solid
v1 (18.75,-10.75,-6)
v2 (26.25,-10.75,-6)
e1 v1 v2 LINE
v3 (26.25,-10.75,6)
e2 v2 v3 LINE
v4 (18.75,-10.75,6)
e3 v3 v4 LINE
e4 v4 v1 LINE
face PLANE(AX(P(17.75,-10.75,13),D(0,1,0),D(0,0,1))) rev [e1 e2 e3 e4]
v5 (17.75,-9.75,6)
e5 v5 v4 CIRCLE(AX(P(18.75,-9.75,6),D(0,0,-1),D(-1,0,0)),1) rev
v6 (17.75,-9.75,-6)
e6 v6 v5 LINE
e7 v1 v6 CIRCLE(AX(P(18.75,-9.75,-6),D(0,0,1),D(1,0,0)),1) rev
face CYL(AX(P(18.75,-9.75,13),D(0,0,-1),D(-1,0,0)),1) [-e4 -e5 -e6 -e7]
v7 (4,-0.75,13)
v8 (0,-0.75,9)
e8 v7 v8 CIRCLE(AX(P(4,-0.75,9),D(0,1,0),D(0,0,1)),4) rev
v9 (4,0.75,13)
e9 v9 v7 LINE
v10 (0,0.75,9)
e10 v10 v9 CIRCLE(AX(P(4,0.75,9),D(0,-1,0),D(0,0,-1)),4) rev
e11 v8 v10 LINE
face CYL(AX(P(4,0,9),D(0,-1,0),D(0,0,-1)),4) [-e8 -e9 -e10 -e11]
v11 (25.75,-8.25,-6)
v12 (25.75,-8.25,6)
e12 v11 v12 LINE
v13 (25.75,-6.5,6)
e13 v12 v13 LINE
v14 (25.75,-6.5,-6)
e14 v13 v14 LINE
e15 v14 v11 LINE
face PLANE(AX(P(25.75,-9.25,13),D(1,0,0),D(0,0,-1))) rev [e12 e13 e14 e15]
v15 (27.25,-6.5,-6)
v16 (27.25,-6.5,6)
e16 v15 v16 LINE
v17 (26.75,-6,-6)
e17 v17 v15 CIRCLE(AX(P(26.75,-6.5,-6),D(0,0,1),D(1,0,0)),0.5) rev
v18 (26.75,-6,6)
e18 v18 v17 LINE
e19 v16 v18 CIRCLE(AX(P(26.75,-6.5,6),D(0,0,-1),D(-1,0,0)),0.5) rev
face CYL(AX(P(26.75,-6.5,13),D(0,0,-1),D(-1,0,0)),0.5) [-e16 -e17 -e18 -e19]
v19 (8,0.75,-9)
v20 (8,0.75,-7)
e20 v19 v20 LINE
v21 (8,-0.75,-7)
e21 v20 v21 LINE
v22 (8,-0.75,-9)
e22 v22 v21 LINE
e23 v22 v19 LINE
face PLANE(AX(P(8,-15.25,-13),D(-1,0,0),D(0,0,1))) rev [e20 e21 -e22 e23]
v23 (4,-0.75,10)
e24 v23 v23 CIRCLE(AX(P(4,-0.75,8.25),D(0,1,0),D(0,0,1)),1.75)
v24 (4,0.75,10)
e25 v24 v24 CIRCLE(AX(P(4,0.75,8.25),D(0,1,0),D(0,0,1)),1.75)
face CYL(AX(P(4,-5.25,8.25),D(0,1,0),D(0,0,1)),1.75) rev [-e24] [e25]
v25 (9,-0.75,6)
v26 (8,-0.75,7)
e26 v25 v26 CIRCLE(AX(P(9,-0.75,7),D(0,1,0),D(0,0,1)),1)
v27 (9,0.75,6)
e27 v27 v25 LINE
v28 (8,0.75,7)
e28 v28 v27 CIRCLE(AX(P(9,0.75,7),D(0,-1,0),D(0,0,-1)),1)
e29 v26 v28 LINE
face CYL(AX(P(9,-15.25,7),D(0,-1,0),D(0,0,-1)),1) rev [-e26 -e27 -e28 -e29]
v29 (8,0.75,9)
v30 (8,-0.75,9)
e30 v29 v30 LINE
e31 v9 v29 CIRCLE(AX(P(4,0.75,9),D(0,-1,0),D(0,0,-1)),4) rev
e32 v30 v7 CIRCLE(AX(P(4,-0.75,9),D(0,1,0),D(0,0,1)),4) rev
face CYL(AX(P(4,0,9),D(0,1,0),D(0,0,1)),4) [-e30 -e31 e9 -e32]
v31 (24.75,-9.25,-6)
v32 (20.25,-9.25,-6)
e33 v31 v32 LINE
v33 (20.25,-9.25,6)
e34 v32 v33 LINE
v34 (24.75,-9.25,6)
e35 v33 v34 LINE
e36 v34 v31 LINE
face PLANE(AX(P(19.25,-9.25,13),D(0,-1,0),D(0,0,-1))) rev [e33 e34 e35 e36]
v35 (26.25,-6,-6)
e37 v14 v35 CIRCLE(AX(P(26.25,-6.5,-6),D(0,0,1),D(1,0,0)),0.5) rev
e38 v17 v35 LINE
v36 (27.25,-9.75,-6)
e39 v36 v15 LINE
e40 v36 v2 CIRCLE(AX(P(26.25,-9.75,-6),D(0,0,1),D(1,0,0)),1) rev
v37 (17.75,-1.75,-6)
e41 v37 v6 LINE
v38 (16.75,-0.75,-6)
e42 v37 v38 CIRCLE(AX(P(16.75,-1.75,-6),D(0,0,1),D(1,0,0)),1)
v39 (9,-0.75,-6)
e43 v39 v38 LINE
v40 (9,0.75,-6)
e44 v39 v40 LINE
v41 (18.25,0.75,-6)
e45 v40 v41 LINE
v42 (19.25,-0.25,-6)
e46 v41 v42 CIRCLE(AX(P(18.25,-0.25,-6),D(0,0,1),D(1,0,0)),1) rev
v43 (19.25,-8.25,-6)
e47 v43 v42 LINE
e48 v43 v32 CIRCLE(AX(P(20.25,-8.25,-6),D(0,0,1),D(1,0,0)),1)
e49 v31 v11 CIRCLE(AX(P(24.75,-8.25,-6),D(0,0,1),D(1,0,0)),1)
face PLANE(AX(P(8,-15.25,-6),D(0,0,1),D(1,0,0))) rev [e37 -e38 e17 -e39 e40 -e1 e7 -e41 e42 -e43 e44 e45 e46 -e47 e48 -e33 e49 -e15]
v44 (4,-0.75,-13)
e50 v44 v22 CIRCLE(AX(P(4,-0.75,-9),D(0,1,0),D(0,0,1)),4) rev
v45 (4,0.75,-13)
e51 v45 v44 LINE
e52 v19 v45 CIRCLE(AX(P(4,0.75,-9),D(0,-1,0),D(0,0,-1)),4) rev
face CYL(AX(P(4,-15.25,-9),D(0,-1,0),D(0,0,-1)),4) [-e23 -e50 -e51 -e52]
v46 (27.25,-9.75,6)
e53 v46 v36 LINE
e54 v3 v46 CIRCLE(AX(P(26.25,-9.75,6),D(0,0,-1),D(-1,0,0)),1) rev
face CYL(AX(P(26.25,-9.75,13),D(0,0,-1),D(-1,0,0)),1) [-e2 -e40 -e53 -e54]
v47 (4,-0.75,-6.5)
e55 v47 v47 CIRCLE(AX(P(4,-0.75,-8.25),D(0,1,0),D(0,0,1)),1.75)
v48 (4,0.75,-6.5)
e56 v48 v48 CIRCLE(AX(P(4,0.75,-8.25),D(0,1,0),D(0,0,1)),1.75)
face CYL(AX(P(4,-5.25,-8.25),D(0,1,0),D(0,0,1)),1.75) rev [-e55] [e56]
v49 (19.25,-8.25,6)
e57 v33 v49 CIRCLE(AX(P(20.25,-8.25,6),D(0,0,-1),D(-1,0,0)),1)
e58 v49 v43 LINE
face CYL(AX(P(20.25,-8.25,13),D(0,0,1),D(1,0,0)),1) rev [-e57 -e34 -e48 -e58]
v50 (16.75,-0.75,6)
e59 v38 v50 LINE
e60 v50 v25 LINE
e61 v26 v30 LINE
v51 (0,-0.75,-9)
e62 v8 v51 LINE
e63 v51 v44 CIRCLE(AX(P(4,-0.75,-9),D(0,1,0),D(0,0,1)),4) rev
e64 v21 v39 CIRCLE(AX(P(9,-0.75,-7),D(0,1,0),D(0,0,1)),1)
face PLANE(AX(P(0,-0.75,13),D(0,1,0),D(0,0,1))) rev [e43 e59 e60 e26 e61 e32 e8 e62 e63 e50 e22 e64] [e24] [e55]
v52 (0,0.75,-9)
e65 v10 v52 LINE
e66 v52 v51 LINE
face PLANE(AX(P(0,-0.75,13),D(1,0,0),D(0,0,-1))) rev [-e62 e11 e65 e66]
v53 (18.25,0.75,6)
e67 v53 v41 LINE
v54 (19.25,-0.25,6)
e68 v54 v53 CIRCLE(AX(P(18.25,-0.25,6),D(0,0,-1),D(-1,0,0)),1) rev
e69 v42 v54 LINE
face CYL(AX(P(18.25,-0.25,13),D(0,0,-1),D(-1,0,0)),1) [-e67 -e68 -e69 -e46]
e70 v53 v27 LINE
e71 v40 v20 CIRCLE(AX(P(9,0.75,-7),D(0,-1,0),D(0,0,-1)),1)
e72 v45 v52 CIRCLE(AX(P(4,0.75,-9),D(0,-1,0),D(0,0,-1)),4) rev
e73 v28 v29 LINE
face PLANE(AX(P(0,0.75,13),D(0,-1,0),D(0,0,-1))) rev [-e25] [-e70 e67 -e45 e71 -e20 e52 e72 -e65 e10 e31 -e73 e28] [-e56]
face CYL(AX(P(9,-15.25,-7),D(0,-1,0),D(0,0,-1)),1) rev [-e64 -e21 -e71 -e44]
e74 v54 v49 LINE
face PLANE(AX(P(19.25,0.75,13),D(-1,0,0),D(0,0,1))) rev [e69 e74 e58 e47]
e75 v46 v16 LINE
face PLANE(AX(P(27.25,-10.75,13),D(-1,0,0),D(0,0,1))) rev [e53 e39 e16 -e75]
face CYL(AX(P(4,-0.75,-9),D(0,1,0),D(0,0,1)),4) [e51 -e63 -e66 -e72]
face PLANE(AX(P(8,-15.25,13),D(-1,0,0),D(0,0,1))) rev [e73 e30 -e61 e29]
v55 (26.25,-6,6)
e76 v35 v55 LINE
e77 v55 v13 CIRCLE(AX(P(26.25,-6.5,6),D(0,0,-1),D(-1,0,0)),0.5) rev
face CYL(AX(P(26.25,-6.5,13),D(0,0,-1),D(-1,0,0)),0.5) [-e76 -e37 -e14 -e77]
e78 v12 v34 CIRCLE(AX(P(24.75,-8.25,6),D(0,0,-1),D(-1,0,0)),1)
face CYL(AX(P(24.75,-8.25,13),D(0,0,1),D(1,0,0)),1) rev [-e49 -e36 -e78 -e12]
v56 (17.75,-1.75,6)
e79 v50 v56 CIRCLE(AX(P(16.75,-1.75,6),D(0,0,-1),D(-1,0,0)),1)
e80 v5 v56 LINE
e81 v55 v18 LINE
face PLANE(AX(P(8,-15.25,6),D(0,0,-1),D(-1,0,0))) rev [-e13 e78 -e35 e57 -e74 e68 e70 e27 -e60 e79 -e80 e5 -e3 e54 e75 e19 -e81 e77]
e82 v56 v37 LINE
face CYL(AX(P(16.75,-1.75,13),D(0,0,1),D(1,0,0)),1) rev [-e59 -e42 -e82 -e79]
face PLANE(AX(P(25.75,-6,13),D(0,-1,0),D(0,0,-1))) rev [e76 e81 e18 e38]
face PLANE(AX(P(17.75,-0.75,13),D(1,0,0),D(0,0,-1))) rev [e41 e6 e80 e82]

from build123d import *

# Parameters (mm, degrees)
EXTRUDE_1_DEPTH     = 13
SKETCH_2_W          = 19.25
SKETCH_2_H          = 7
CUT_EXTRUDE_1_DEPTH = 16
SKETCH_3_R          = 1.75
CUT_EXTRUDE_2_DEPTH = 6
FILLET_1_R          = 4
FILLET_2_R          = 1
FILLET_3_R          = 1
FILLET_4_R          = 0.5


with BuildPart() as part:
    # 草图1 → 凸台-拉伸1 (new, symmetric)
    with BuildSketch(Plane.XY):
        Polygon((0, -0.75), (17.75, -0.75), (17.75, -10.75), (27.25, -10.75), (27.25, -6), (25.75, -6), (25.75, -9.25), (19.25, -9.25), (19.25, 0.75), (0, 0.75), align=None)
    extrude(amount=EXTRUDE_1_DEPTH, both=True)

    # 草图2 → 切除-拉伸1 (cut)
    with BuildSketch(Plane(origin=(0, 0.75, 0), x_dir=(1, 0, 0), z_dir=(0, 1, 0))):
        with Locations((17.625, 9.5)):
            Rectangle(SKETCH_2_W, SKETCH_2_H)
        with Locations((17.625, -9.5)):
            Rectangle(SKETCH_2_W, SKETCH_2_H)
    extrude(amount=-CUT_EXTRUDE_1_DEPTH, mode=Mode.SUBTRACT)

    # 草图3 → 切除-拉伸2 (cut)
    with BuildSketch(Plane(origin=(0, 0.75, 0), x_dir=(1, 0, 0), z_dir=(0, 1, 0))):
        with Locations(Location((4, 8.25, 0), (0, 0, 270))):
            Circle(SKETCH_3_R)
        with Locations(Location((4, -8.25, 0), (0, 0, 270))):
            Circle(SKETCH_3_R)
    extrude(amount=-CUT_EXTRUDE_2_DEPTH, mode=Mode.SUBTRACT)

    # 圆角1
    fillet_1_edges = [part.edges().sort_by_distance(p)[0] for p in [
        (8, 0, 13),
        (0, 0, 13),
        (0, 0, -13),
        (8, 0, -13),
    ]]
    fillet(fillet_1_edges, radius=FILLET_1_R - 0.0001)  # a hair under: the kernel refuses the full size

    # 圆角2
    fillet_2_edges = [part.edges().sort_by_distance(p)[0] for p in [
        (8, 0, -6),
        (8, 0, 6),
    ]]
    fillet(fillet_2_edges, radius=FILLET_2_R)

    # 圆角3
    fillet_3_edges = [part.edges().sort_by_distance(p)[0] for p in [
        (19.25, 0.75, 0),
        (19.25, -9.25, 0),
        (25.75, -9.25, 0),
        (27.25, -10.75, 0),
        (17.75, -10.75, 0),
        (17.75, -0.75, 0),
    ]]
    fillet(fillet_3_edges, radius=FILLET_3_R)

    # 圆角4
    fillet_4_edges = [part.edges().sort_by_distance(p)[0] for p in [
        (25.75, -6, 0),
        (27.25, -6, 0),
    ]]
    fillet(fillet_4_edges, radius=FILLET_4_R)


solid = part.part
